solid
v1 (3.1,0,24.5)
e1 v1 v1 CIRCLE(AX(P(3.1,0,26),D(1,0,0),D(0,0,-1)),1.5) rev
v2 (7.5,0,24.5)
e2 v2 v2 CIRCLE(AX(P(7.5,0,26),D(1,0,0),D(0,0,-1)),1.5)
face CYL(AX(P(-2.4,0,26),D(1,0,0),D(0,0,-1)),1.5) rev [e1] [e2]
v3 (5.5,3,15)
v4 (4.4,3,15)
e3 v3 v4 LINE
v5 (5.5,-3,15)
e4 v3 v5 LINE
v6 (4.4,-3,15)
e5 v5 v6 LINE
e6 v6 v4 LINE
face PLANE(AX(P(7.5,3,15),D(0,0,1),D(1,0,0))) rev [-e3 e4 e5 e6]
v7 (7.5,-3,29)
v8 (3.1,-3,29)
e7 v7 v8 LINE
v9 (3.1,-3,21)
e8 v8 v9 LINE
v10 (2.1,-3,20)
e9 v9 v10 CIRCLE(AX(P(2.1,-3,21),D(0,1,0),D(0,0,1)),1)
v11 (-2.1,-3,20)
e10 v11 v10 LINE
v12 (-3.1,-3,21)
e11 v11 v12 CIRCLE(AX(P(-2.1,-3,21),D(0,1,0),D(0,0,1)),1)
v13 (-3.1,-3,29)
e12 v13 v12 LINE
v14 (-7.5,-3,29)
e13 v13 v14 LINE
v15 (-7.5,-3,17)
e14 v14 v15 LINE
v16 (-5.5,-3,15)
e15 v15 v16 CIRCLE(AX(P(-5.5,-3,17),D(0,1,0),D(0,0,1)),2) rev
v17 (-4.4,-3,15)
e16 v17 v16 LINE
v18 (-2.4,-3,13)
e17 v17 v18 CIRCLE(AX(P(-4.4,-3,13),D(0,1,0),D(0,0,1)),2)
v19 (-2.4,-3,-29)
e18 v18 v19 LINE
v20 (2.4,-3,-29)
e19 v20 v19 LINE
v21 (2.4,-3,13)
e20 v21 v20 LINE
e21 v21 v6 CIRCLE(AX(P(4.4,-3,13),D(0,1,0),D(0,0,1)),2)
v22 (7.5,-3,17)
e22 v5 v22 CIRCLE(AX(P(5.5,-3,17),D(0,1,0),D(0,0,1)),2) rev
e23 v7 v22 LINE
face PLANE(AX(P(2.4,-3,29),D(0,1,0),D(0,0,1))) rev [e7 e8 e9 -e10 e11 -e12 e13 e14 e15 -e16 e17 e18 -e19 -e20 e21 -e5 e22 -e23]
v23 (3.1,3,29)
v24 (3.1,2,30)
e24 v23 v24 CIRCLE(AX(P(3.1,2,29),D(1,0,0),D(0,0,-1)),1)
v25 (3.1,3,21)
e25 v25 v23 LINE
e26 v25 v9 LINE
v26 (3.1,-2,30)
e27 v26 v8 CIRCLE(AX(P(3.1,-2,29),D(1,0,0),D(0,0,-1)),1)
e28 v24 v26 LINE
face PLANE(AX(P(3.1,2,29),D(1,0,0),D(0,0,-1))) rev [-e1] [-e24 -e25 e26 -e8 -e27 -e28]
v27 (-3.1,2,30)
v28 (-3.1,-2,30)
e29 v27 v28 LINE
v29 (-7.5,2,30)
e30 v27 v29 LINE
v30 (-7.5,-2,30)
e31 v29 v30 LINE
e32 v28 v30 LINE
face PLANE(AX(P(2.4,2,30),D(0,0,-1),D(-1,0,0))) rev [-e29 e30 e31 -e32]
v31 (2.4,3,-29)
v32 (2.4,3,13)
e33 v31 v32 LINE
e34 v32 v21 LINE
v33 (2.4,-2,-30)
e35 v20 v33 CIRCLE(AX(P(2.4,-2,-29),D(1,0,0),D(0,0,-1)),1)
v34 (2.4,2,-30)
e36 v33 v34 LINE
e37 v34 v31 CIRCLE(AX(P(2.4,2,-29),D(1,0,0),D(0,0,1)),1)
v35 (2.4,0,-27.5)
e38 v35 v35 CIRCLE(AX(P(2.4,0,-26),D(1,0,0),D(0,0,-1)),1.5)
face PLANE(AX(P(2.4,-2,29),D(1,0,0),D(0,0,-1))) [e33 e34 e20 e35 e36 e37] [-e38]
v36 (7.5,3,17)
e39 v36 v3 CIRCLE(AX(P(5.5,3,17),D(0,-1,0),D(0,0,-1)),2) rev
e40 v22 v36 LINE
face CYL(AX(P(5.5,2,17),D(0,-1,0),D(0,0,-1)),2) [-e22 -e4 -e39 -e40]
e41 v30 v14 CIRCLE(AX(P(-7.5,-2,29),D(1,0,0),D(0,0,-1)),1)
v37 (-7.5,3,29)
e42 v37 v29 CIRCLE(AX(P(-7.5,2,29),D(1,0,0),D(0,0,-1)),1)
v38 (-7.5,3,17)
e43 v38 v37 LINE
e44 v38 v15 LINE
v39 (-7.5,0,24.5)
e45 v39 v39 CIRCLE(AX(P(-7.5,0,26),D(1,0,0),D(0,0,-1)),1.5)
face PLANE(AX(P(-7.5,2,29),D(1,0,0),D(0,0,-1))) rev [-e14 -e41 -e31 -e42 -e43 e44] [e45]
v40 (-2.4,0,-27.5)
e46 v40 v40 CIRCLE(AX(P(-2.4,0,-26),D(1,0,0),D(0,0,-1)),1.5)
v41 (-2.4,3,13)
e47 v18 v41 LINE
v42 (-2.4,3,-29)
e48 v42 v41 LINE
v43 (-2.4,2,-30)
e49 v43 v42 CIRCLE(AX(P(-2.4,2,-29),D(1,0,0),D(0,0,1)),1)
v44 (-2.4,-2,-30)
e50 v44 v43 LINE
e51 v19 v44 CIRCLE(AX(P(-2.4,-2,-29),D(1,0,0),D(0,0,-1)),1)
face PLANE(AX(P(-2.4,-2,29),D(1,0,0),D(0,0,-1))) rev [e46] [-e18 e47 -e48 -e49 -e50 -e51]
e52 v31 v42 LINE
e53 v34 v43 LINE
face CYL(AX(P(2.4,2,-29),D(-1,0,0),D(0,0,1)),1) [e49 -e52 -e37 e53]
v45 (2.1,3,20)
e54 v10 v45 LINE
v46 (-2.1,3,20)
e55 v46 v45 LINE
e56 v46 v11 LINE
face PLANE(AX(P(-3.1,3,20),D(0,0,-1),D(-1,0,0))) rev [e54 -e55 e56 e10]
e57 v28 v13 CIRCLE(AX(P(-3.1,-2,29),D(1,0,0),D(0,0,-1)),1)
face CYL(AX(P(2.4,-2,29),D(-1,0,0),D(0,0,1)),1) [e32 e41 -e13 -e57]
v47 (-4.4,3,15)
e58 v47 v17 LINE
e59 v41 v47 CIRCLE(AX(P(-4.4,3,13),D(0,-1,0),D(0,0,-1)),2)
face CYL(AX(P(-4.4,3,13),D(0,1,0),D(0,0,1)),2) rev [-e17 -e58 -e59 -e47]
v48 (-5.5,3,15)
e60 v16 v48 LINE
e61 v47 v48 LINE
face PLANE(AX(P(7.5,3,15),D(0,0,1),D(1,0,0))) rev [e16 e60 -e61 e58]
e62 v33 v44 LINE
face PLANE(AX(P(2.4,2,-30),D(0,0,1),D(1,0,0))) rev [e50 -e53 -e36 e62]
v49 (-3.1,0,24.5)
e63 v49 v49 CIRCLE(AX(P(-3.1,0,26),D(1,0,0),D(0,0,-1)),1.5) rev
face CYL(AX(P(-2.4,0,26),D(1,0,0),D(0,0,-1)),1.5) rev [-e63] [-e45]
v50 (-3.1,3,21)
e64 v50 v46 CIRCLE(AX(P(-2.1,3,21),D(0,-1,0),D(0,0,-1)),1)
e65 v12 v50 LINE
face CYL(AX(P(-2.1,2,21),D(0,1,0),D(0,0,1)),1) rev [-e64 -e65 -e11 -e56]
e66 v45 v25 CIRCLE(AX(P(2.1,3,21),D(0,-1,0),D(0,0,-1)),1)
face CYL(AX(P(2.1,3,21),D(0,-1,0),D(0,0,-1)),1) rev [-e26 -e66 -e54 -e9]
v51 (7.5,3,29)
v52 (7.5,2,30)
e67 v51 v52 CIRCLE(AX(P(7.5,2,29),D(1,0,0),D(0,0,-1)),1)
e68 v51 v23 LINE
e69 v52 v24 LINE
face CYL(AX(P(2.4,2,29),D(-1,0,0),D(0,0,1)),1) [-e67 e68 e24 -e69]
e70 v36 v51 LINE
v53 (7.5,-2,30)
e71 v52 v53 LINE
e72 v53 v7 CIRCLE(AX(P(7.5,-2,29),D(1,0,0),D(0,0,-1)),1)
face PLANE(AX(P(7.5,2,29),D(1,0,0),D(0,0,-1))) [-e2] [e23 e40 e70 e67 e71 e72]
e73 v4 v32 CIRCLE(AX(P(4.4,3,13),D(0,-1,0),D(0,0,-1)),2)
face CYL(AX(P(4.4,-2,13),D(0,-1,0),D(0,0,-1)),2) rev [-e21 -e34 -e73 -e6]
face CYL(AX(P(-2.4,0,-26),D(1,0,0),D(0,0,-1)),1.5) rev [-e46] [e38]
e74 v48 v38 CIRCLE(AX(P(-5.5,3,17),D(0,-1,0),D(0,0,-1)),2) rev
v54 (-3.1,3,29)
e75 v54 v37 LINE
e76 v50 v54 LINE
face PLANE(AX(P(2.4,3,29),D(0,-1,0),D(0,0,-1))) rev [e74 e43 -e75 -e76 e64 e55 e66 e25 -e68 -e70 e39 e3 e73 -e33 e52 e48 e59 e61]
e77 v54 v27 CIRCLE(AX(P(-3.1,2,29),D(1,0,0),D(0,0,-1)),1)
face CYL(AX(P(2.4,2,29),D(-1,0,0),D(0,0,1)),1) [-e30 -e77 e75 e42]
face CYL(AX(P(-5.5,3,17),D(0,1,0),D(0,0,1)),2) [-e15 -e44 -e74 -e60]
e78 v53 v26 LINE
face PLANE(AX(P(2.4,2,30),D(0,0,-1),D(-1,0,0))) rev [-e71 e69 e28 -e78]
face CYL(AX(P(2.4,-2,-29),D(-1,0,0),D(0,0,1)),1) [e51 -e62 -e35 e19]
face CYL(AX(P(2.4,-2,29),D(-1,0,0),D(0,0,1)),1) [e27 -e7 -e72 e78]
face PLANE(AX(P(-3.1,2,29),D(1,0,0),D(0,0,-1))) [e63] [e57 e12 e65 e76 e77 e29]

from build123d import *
from build123d.topology import SkipClean

# Parameters (mm, degrees)
SALIENTE_EXTRUIR1_DEPTH    = 2.4
CORTAR_EXTRUIR1_DEPTH      = 31.244999587
CORTAR_EXTRUIR1_DEPTH_BACK = 31.244999587
CROQUIS2_R                 = 1.5
CROQUIS3_R                 = 1.5
SALIENTE_EXTRUIR2_DEPTH    = 7.5
CORTAR_EXTRUIR2_DEPTH      = 3.1
REDONDEO1_R                = 2
REDONDEO2_R                = 1


with BuildPart() as part:
    # Croquis1 → Saliente-Extruir1 (new, symmetric)
    with BuildSketch(Plane(origin=(0, 0, 0), x_dir=(0, 0, -1), z_dir=(1, 0, 0))):
        with BuildLine():
            Line((-29, 3), (29, 3))
            ThreePointArc((29, 3), (29.707106781, 2.707106781), (30, 2))
            Line((30, 2), (30, -2))
            ThreePointArc((30, -2), (29.707106781, -2.707106781), (29, -3))
            Line((29, -3), (-29, -3))
            ThreePointArc((-29, -3), (-29.707106781, -2.707106781), (-30, -2))
            Line((-30, -2), (-30, 2))
            ThreePointArc((-30, 2), (-29.707106781, 2.707106781), (-29, 3))
        make_face()
    extrude(amount=SALIENTE_EXTRUIR1_DEPTH, both=True)

    # Croquis2 → Cortar-Extruir1 (cut, two sides: drawn at the far end of the back side and taken through both)
    with BuildSketch(Plane(origin=(0, 0, 0), x_dir=(0, 0, -1), z_dir=(1, 0, 0)).offset(-CORTAR_EXTRUIR1_DEPTH_BACK)):
        with Locations((-26, 0)):
            Circle(CROQUIS2_R)
        with Locations((26, 0)):
            Circle(CROQUIS2_R)
    extrude(amount=CORTAR_EXTRUIR1_DEPTH + CORTAR_EXTRUIR1_DEPTH_BACK, mode=Mode.SUBTRACT)

    # Croquis3 → Saliente-Extruir2 (add, symmetric)
    with SkipClean():  # the faces are left unmerged after this step: merging them gives an invalid solid
        with BuildSketch(Plane(origin=(0, 0, 0), x_dir=(0, 0, -1), z_dir=(1, 0, 0))):
            with BuildLine():
                Line((-30, 2), (-30, -2))
                ThreePointArc((-30, -2), (-29.707106781, -2.707106781), (-29, -3))
                Line((-29, -3), (-15, -3))
                Line((-15, -3), (-15, 3))
                Line((-15, 3), (-29, 3))
                ThreePointArc((-29, 3), (-29.707106781, 2.707106781), (-30, 2))
            make_face()
            with Locations((-26, 0)):
                Circle(CROQUIS3_R, mode=Mode.SUBTRACT)
        extrude(amount=SALIENTE_EXTRUIR2_DEPTH, both=True)
    add(part.part.scale(1), mode=Mode.REPLACE)  # the faces are merged on a copy

    # Croquis4 → Cortar-Extruir2 (cut, symmetric)
    with BuildSketch(Plane(origin=(0, 0, 0), x_dir=(0, 0, -1), z_dir=(1, 0, 0))):
        with BuildLine():
            Line((-29, 3), (-20, 3))
            Line((-20, 3), (-20, -3))
            Line((-20, -3), (-29, -3))
            ThreePointArc((-29, -3), (-29.707106781, -2.707106781), (-30, -2))
            Line((-30, -2), (-30, 2))
            ThreePointArc((-30, 2), (-29.707106781, 2.707106781), (-29, 3))
        make_face()
    extrude(amount=CORTAR_EXTRUIR2_DEPTH, both=True, mode=Mode.SUBTRACT)

    # Redondeo1
    redondeo1_edges = [part.edges().sort_by_distance(p)[0] for p in [
        (-2.4, 0, 15),
        (2.4, 0, 15),
        (-7.5, 0, 15),
        (7.5, 0, 15),
    ]]
    fillet(redondeo1_edges, radius=REDONDEO1_R)

    # Redondeo2
    redondeo2_edges = [part.edges().sort_by_distance(p)[0] for p in [
        (3.1, 0, 20),
        (-3.1, 0, 20),
    ]]
    fillet(redondeo2_edges, radius=REDONDEO2_R)


solid = part.part
